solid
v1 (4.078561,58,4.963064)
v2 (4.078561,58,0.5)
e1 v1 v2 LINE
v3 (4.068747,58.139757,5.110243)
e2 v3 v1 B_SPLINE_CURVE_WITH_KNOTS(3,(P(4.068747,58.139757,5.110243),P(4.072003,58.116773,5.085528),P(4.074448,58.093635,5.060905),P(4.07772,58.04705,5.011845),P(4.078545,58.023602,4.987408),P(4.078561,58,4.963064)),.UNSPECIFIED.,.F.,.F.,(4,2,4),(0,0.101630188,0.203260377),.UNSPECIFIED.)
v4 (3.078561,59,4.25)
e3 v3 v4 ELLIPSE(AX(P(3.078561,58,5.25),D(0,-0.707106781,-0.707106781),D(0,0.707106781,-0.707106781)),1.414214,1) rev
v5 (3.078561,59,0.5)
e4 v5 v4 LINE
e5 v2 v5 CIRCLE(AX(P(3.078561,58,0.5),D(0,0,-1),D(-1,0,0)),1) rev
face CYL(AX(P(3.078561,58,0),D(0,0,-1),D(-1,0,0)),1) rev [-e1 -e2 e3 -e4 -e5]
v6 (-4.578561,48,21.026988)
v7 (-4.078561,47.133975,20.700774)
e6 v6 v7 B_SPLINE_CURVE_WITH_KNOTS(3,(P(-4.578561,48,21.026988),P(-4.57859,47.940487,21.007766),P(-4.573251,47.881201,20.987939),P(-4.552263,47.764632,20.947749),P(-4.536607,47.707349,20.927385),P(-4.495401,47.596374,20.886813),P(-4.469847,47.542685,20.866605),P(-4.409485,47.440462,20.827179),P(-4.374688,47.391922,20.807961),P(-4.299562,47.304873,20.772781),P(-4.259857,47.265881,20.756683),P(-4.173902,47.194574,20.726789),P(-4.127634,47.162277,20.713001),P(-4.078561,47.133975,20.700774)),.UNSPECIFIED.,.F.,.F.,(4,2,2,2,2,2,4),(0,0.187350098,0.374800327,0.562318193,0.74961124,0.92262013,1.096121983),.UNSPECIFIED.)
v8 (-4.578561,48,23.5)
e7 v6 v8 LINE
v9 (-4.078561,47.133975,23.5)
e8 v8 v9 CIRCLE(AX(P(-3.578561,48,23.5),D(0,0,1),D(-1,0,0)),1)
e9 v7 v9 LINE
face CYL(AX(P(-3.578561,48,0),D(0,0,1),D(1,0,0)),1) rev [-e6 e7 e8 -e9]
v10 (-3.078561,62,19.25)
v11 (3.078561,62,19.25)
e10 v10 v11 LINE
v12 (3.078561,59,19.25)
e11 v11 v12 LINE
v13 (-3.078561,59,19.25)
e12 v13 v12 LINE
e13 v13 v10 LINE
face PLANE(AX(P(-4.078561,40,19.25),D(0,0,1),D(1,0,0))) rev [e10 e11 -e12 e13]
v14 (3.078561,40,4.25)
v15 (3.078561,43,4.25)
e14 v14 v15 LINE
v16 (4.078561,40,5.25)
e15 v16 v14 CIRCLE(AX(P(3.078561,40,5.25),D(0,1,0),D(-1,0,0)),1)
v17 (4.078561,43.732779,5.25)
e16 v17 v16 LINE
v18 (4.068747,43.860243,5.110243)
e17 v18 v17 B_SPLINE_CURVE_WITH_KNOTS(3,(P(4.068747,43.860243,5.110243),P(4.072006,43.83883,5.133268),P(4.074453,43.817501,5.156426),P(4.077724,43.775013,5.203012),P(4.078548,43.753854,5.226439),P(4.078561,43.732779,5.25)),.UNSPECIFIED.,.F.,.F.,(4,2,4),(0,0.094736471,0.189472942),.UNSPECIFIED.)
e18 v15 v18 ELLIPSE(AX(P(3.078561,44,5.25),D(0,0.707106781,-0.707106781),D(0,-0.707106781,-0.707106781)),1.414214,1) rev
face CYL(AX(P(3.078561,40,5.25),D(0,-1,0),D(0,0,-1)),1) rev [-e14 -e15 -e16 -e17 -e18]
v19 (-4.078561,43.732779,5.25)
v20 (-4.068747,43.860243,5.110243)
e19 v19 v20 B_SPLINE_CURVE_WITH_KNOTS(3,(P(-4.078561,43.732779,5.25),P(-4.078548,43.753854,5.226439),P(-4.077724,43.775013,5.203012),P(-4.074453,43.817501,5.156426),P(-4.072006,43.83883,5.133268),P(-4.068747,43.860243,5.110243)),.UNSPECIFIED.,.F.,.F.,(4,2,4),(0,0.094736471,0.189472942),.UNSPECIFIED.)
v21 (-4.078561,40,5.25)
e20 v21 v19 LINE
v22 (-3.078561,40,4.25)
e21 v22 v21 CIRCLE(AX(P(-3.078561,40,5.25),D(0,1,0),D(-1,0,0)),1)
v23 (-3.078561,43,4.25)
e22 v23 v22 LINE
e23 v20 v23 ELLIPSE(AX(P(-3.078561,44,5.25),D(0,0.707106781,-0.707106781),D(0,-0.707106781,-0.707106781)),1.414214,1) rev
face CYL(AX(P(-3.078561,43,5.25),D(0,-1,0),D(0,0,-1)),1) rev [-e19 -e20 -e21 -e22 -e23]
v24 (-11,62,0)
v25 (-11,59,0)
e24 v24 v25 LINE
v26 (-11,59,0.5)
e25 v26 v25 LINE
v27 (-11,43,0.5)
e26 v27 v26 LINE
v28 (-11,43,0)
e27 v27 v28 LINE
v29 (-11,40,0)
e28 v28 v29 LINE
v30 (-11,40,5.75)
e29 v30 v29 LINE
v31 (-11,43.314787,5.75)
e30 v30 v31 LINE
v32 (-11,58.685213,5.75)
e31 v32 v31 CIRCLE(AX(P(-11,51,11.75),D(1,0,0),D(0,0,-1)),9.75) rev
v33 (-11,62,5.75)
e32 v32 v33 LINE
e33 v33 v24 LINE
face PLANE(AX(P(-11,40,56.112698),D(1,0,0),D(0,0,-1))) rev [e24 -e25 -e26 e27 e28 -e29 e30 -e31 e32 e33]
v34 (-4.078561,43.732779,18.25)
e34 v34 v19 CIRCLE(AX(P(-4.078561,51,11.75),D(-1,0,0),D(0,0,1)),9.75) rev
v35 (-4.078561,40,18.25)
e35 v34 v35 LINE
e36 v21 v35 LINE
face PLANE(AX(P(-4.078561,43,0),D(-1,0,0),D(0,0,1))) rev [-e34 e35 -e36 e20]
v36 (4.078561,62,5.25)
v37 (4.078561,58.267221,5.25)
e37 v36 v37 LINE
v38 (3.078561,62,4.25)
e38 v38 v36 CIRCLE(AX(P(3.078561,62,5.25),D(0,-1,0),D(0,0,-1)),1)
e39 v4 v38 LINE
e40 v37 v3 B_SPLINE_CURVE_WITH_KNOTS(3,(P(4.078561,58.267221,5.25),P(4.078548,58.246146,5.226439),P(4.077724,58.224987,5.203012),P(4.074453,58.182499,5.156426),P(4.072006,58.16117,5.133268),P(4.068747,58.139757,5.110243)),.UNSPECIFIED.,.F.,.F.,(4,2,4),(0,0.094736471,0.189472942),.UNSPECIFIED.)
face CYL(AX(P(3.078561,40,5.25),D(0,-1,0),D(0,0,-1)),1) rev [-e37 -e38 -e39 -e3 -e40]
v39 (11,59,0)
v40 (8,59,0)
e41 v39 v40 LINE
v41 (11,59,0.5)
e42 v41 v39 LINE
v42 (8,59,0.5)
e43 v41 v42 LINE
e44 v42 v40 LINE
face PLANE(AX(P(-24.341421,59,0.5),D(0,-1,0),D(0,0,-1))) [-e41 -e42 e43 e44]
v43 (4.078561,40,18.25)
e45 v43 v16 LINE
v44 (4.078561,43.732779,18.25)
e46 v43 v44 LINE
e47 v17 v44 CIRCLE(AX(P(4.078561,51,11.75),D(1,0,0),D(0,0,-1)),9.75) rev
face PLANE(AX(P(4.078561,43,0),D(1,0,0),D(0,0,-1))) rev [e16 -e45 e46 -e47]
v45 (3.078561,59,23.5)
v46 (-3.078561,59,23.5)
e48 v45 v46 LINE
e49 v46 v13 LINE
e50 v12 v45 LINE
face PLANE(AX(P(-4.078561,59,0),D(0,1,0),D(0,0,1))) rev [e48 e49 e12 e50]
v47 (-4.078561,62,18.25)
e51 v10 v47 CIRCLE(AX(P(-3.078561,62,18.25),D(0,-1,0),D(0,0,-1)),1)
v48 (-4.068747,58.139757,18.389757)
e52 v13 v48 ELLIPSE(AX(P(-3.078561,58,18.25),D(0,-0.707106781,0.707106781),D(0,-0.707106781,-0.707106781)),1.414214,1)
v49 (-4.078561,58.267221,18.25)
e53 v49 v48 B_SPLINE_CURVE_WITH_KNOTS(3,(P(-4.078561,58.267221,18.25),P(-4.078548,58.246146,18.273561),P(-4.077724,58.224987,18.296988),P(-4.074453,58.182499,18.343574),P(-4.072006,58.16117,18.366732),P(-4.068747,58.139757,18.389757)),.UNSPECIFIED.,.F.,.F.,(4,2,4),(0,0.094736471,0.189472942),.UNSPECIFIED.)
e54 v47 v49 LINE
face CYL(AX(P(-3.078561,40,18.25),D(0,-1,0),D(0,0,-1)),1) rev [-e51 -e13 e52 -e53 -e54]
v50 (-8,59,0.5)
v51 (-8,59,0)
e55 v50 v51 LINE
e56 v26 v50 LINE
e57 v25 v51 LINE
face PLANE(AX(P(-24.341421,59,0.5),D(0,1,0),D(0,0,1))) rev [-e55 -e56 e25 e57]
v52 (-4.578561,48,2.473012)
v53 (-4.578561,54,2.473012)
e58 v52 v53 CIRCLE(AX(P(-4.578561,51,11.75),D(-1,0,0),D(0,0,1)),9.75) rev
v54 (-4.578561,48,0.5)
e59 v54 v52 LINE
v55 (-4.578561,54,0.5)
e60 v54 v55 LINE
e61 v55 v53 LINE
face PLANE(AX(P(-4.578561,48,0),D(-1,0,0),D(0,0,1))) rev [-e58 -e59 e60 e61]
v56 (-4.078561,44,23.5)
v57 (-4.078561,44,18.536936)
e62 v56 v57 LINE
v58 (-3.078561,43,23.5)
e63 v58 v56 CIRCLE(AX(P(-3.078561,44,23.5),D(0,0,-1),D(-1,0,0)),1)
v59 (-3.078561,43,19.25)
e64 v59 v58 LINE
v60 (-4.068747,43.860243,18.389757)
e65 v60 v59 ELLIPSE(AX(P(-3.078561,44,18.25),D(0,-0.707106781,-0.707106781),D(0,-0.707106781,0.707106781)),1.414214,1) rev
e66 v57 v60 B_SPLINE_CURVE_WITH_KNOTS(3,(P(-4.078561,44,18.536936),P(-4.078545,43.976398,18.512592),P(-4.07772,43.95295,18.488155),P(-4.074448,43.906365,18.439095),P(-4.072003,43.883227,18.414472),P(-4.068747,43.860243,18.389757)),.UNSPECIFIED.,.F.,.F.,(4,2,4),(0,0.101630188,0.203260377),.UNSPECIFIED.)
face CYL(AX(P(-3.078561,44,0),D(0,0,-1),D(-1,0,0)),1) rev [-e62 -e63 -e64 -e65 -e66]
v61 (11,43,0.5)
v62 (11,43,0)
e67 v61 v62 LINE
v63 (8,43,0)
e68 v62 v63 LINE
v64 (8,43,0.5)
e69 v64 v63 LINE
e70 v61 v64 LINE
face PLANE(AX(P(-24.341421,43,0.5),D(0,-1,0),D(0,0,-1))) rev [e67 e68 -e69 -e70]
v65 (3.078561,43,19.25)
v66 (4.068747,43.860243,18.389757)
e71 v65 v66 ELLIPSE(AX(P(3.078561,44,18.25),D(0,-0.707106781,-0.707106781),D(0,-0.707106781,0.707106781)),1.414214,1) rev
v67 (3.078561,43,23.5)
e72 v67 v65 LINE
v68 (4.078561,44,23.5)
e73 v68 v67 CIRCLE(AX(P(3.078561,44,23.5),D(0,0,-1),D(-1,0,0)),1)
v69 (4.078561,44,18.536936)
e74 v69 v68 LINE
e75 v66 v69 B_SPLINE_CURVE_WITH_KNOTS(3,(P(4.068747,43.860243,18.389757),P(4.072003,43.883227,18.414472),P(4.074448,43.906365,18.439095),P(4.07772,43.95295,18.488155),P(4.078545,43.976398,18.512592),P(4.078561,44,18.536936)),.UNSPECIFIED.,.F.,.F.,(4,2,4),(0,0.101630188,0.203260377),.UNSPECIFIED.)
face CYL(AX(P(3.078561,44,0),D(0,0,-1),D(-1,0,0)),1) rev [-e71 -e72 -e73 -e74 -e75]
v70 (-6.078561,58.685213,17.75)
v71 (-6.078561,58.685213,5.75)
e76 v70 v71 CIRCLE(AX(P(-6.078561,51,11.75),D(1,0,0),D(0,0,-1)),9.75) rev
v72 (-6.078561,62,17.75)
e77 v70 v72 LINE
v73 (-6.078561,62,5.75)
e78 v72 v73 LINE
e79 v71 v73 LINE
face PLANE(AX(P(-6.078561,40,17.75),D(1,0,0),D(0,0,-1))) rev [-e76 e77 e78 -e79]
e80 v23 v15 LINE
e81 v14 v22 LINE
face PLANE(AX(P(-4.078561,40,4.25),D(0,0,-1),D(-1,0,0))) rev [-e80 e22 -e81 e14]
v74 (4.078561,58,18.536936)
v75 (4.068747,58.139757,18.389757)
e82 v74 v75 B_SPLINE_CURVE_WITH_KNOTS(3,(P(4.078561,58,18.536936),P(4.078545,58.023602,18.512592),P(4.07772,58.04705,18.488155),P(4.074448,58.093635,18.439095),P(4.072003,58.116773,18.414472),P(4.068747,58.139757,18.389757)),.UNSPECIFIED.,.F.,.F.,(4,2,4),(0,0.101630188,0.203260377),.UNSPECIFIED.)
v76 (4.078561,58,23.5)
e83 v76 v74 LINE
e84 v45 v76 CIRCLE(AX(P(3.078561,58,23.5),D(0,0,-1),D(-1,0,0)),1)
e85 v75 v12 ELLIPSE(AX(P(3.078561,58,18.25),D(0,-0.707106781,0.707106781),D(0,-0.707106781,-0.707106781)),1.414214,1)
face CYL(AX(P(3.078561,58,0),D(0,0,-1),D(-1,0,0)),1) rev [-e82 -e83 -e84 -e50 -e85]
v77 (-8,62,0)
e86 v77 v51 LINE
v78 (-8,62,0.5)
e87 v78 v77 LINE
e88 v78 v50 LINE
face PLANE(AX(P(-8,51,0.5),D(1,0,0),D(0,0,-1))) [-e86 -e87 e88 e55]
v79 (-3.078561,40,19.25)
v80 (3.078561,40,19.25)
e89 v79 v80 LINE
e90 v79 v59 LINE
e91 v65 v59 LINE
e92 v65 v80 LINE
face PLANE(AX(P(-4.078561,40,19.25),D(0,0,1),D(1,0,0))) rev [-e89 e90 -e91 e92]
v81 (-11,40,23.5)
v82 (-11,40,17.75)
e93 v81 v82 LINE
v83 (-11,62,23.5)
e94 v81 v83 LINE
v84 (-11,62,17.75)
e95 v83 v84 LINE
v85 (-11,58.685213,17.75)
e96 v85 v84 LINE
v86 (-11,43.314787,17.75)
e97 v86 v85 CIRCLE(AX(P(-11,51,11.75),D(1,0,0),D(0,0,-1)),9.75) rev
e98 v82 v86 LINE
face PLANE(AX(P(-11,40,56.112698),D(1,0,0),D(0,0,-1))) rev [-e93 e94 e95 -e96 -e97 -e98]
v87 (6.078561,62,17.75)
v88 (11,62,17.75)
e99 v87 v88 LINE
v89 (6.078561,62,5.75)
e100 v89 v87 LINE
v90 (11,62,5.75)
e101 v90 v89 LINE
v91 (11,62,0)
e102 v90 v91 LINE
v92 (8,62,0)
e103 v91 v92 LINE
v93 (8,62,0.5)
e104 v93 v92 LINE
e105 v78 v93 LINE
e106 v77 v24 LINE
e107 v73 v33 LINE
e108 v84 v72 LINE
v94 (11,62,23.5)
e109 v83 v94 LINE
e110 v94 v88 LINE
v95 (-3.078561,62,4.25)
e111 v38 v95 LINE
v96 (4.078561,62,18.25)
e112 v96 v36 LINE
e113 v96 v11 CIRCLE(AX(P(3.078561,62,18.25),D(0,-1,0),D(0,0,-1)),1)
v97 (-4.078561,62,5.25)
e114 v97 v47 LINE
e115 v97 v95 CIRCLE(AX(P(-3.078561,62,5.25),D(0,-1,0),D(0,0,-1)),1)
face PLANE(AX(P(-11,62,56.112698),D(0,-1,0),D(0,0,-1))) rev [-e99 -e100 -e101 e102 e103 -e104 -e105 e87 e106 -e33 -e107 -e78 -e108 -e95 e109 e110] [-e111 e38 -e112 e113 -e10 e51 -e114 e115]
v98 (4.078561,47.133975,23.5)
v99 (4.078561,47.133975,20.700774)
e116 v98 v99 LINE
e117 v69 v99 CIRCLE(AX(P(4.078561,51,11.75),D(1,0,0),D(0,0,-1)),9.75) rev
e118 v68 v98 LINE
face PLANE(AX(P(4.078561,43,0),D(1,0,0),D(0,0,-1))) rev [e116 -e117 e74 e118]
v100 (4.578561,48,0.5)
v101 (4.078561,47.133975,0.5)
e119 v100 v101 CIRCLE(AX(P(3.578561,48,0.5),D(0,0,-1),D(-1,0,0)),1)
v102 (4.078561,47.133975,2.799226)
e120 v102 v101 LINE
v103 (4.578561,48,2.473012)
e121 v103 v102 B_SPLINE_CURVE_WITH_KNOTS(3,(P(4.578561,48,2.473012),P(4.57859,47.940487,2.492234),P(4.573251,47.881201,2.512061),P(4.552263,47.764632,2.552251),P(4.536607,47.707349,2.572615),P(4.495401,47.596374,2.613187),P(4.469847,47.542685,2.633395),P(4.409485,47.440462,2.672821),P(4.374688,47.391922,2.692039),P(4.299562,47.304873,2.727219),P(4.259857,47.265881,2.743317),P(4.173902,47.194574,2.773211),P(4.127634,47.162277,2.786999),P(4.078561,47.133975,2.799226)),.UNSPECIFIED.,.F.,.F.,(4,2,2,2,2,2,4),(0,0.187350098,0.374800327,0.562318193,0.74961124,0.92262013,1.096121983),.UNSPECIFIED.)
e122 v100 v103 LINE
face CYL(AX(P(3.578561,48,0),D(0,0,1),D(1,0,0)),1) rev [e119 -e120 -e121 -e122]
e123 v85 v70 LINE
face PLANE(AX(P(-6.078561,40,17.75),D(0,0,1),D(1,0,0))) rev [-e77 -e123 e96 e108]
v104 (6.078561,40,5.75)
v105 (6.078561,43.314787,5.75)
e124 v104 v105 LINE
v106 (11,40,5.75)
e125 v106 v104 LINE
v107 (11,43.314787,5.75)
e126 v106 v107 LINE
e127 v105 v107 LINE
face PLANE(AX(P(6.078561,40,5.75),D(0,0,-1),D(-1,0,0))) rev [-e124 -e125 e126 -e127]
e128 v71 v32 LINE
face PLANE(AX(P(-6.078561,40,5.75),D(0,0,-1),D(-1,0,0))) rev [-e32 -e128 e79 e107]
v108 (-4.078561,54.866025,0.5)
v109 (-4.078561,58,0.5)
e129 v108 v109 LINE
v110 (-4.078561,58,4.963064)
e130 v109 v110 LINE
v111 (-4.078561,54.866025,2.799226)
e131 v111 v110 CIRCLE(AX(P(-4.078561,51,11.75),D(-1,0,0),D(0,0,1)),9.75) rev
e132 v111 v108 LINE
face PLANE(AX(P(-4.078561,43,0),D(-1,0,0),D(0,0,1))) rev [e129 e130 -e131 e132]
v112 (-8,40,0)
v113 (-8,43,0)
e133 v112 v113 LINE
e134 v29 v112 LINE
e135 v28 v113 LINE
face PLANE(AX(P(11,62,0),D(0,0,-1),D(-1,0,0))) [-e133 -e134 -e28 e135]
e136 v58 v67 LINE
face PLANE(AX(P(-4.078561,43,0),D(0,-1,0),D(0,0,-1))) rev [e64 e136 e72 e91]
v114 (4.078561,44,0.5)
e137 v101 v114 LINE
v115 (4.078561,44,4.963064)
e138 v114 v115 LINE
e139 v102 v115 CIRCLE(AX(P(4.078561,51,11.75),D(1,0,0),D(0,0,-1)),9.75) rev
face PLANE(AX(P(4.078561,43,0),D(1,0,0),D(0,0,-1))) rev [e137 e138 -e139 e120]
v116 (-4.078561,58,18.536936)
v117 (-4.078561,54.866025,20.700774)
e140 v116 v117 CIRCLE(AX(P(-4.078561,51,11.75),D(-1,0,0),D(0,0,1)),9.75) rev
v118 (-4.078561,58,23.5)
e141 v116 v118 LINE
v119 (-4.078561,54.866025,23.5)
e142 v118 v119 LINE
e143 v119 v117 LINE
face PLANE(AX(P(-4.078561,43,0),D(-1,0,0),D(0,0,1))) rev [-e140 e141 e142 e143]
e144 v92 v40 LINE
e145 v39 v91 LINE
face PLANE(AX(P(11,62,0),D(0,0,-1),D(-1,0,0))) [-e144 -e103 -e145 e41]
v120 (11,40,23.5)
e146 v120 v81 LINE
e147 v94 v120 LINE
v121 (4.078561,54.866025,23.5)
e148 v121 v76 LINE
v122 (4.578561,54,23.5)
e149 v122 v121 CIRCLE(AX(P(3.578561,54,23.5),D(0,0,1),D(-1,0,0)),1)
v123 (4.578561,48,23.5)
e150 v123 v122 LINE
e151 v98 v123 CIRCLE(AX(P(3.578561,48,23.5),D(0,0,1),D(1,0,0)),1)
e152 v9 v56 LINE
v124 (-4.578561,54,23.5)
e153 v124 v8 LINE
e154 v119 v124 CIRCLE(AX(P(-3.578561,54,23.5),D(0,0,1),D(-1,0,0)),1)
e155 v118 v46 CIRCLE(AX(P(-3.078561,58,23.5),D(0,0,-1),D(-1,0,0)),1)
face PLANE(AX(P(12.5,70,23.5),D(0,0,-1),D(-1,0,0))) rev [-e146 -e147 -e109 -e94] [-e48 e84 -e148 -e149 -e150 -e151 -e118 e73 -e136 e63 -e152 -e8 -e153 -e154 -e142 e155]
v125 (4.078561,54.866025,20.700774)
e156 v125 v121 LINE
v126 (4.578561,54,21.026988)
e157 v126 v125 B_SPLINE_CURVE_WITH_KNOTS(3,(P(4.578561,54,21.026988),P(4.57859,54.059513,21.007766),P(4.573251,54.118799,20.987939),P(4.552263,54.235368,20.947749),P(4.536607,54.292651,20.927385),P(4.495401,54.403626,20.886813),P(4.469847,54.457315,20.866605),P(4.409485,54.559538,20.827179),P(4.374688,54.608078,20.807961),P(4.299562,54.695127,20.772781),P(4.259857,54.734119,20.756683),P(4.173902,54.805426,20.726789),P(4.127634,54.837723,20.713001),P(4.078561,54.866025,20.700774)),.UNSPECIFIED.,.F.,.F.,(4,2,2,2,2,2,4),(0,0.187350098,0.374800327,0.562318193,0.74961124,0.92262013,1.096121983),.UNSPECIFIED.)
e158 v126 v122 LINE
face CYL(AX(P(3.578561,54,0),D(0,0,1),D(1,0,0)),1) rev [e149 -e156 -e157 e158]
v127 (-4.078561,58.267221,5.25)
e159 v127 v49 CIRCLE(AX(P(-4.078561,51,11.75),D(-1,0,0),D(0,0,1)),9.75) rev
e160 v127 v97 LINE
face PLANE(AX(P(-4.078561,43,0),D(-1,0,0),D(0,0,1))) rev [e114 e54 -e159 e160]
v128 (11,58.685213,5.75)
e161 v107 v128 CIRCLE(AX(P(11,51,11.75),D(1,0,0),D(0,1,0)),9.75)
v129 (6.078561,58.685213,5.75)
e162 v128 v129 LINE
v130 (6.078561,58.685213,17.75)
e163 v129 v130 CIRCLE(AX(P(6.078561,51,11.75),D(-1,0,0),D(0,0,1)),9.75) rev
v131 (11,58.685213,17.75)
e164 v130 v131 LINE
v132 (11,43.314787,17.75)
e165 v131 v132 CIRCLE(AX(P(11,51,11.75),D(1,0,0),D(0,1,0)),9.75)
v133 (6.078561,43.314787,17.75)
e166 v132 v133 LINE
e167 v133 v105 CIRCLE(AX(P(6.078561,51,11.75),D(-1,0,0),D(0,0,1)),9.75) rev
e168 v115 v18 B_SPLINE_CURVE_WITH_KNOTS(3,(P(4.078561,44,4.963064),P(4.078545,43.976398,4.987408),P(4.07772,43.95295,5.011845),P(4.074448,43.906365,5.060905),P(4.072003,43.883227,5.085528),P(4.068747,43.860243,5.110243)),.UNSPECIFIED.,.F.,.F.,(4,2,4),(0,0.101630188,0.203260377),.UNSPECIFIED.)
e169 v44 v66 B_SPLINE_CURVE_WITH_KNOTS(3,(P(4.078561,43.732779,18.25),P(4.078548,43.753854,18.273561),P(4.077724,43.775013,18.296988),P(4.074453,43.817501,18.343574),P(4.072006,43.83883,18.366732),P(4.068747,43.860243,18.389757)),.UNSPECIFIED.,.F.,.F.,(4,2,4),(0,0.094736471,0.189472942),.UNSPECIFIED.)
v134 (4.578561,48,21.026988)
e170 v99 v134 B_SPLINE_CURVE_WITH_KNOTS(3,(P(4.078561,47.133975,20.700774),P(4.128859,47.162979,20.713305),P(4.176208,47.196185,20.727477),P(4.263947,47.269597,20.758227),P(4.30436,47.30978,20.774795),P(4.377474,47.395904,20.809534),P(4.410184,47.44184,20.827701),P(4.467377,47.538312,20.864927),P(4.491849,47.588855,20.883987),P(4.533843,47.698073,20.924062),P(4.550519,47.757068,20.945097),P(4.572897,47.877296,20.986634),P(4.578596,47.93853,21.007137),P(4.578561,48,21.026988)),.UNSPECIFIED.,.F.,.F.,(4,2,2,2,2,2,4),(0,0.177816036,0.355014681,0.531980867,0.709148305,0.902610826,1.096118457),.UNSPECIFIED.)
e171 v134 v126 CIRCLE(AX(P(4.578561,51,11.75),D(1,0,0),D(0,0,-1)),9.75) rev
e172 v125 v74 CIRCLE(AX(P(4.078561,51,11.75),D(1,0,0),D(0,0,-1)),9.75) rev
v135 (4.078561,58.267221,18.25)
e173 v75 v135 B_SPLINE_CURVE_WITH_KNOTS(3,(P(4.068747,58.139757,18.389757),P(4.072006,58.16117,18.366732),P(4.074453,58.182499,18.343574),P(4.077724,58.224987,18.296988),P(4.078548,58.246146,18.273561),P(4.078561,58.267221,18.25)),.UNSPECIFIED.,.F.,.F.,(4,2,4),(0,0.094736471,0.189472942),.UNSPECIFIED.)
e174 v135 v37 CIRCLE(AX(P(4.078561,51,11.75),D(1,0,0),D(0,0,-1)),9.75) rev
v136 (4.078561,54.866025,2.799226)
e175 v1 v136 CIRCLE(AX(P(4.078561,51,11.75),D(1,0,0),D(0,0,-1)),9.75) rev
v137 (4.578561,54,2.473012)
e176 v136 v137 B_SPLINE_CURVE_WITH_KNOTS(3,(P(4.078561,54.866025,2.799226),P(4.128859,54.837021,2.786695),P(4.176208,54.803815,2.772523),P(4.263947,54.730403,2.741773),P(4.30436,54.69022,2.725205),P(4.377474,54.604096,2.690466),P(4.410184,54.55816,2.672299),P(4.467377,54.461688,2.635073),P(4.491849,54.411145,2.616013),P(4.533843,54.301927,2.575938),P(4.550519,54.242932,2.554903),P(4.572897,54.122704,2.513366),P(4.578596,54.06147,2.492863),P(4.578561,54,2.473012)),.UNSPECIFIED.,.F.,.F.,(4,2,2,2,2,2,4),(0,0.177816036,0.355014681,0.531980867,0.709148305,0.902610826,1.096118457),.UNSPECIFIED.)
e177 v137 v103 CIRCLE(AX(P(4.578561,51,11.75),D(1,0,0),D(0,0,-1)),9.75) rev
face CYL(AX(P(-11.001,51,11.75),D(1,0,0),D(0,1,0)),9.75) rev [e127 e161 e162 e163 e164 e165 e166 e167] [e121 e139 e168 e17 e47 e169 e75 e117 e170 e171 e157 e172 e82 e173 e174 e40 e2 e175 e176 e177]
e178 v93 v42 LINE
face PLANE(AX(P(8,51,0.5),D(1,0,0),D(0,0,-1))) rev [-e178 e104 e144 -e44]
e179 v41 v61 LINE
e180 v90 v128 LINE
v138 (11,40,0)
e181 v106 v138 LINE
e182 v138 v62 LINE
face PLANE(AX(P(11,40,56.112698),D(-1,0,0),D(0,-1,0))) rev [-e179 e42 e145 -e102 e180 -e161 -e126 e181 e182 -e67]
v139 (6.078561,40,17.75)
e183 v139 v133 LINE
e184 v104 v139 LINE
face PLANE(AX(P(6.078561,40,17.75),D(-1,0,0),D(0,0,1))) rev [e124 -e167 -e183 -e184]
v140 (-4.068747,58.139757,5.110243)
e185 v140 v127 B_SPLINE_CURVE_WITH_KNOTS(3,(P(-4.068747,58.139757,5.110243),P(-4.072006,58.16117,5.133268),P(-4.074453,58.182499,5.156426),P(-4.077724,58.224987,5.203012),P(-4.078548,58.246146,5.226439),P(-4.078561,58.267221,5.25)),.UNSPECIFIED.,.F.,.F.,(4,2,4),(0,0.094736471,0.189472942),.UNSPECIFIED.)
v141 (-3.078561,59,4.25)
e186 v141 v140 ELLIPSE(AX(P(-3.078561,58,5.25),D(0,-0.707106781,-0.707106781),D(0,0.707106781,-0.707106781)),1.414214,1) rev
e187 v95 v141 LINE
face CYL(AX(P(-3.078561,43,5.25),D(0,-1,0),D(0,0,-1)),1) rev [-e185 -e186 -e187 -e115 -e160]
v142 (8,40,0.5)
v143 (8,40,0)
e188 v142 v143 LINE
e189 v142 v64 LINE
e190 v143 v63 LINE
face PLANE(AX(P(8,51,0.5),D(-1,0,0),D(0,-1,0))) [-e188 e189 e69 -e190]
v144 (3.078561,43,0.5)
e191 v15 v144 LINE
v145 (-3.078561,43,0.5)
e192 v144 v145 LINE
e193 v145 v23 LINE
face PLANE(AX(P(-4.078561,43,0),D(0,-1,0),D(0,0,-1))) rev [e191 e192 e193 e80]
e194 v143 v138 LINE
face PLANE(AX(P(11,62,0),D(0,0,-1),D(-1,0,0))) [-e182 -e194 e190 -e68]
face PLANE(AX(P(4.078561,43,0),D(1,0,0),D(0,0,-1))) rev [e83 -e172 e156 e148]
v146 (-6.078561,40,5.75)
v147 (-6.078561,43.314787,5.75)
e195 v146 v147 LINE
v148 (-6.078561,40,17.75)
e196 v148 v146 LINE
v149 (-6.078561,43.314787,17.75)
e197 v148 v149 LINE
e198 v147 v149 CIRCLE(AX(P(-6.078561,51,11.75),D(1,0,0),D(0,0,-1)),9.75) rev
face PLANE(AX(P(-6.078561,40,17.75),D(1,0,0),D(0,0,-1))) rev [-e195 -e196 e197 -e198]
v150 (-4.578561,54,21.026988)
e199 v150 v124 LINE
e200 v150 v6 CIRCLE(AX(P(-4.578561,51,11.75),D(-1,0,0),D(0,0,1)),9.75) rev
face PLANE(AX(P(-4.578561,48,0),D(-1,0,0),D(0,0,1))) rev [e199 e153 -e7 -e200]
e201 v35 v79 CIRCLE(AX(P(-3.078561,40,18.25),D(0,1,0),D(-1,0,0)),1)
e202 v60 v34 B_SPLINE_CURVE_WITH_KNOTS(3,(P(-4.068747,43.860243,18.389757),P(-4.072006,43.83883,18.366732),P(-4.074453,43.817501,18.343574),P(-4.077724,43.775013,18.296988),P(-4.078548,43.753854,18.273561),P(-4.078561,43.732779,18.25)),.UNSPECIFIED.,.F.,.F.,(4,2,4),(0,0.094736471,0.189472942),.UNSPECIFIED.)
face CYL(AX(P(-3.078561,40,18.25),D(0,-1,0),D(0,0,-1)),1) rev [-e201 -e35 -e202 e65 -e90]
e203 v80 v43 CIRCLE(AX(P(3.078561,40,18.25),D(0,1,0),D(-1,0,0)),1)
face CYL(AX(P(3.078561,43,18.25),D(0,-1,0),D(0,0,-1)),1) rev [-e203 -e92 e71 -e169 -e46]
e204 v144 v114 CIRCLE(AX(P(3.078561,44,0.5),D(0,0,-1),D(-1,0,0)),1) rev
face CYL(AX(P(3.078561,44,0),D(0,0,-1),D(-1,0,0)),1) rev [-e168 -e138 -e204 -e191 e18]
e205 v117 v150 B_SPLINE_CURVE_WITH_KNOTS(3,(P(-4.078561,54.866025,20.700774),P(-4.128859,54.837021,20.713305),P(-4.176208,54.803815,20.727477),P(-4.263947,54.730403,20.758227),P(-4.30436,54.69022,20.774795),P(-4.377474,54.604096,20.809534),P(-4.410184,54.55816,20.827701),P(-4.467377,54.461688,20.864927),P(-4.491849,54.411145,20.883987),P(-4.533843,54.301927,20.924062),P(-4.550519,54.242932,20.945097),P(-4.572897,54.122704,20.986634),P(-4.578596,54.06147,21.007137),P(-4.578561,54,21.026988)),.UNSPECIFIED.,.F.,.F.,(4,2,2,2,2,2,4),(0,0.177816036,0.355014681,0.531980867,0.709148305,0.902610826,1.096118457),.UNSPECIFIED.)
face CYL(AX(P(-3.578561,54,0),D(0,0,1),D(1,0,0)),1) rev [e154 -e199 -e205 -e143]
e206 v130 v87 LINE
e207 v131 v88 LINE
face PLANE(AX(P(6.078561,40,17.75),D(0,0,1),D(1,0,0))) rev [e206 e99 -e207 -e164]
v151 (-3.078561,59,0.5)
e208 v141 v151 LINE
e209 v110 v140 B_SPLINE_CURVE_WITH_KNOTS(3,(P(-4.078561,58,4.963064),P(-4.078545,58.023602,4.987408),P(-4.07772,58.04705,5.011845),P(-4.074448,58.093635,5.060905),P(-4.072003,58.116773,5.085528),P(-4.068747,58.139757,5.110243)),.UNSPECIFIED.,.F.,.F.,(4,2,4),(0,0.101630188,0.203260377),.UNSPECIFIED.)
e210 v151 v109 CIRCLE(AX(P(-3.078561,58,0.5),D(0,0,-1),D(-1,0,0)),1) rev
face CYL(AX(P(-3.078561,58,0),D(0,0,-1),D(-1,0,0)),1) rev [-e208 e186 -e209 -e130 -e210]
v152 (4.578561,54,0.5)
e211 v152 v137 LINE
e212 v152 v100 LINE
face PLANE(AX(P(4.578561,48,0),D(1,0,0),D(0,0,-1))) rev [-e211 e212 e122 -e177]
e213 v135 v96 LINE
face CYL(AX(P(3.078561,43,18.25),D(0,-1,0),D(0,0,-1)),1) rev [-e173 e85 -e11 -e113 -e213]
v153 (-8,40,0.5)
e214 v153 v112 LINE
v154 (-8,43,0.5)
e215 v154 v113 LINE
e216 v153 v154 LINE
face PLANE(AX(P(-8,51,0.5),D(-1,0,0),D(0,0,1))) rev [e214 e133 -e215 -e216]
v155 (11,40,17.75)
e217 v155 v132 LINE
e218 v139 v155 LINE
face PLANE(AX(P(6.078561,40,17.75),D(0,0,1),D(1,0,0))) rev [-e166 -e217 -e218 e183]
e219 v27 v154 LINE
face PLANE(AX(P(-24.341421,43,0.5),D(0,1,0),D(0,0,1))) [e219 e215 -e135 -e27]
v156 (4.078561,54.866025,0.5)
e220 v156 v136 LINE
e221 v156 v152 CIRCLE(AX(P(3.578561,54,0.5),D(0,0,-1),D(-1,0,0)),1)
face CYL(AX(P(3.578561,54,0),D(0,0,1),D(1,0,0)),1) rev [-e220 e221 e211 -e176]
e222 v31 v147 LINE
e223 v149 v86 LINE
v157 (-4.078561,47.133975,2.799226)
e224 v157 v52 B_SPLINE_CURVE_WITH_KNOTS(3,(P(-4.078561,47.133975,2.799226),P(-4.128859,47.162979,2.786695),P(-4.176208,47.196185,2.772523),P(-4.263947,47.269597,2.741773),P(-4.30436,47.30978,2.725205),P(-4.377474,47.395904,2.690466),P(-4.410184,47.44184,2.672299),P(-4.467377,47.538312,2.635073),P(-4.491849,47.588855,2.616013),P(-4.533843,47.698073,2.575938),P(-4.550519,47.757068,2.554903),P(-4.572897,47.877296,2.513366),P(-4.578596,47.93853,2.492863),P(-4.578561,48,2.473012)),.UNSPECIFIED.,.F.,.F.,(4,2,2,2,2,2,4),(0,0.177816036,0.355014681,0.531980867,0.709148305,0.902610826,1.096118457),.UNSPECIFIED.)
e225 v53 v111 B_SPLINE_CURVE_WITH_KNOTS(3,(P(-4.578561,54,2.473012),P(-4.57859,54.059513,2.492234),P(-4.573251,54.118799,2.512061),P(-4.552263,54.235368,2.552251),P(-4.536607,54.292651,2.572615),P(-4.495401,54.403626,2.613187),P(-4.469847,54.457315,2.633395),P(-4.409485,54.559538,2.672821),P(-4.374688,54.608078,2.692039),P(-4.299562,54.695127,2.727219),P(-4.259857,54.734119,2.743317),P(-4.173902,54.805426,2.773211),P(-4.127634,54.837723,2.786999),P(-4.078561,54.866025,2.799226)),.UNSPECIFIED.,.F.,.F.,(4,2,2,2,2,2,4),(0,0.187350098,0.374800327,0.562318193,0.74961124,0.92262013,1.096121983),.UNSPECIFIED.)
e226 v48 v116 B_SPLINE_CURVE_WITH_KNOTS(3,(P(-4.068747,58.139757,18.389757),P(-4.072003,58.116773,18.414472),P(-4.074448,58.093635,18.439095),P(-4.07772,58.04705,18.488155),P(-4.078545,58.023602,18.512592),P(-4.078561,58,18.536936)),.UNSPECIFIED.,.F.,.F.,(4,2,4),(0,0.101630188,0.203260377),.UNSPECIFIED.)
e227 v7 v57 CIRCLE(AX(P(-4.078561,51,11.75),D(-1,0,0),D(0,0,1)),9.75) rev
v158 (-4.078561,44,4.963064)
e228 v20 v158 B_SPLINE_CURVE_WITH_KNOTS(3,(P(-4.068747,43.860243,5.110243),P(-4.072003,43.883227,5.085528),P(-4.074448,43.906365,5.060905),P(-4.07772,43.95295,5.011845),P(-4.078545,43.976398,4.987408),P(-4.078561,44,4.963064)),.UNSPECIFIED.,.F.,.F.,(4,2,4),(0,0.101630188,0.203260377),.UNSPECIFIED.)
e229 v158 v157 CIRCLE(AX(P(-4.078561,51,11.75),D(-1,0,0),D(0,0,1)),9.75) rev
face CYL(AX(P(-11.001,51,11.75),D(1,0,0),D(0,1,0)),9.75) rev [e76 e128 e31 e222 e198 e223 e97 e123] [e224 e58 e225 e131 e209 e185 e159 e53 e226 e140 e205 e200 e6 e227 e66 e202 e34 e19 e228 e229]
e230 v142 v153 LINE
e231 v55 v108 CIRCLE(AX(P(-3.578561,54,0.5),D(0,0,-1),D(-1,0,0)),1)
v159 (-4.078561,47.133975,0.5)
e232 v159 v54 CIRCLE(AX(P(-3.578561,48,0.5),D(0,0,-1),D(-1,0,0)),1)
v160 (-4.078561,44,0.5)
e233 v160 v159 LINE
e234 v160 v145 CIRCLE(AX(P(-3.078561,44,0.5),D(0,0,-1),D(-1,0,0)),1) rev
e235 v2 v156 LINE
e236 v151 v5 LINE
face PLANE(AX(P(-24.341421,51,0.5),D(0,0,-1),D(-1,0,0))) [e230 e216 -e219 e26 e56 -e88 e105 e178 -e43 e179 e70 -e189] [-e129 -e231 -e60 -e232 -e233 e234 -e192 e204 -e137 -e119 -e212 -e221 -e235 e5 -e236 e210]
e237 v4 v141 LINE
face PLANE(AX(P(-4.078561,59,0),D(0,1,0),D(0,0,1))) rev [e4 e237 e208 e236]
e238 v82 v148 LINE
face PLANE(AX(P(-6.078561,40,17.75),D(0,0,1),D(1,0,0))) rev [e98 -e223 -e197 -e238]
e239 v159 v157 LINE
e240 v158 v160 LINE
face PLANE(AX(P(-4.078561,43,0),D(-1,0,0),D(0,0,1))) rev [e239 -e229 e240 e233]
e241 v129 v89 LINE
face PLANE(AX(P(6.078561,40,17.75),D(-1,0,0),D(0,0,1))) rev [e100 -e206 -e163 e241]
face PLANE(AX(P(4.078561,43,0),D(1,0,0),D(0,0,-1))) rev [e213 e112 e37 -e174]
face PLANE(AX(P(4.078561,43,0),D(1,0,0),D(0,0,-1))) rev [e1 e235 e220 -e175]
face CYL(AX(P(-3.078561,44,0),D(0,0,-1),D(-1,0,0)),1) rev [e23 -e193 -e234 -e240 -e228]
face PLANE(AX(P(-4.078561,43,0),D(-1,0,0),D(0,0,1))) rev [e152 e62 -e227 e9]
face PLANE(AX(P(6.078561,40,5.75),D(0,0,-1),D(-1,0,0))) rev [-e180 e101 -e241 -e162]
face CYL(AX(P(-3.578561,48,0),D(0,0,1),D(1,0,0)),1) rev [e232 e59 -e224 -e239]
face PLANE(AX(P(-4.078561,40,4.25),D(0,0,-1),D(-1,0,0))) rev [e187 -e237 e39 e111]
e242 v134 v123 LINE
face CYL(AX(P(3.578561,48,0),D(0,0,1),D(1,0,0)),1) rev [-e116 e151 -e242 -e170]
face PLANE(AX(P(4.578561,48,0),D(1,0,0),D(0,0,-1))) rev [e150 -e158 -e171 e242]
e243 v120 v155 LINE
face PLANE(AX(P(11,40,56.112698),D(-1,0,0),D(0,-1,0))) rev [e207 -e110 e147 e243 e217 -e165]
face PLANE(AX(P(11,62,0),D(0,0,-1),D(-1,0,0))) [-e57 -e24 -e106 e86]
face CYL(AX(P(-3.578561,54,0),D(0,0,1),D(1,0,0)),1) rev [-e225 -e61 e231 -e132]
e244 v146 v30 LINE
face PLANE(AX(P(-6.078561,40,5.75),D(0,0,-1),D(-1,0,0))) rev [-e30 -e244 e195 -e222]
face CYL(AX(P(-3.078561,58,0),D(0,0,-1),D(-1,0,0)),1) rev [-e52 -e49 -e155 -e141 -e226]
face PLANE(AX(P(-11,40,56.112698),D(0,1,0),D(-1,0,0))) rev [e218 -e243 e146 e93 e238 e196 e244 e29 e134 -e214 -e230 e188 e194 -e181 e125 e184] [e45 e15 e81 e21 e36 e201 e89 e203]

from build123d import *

# Parameters (mm, degrees)
SKETCH1_W           = 22
SKETCH1_H           = 22
BOSS_EXTRUDE1_DEPTH = 23.5
CUT_EXTRUDE1_REACH  = 71.859
SKETCH2_R           = 9.75
CUT_EXTRUDE2_DEPTH  = 0.5
SKETCH5_W           = 8.157122282
SKETCH5_H           = 16
CUT_EXTRUDE3_DEPTH  = 68.210490253
SKETCH6_W           = 8.157122282
SKETCH6_H           = 15
CUT_EXTRUDE4_DEPTH  = 35.018377386
SKETCH7_W           = 4.921438859
SKETCH7_H           = 12
CUT_EXTRUDE5_DEPTH  = 35.018377386
CUT_EXTRUDE6_DEPTH  = 68.210490253
FILLET1_R           = 1


with BuildPart() as part:
    # Sketch1 → Boss-Extrude1 (new body)
    with BuildSketch(Plane.XY):
        with Locations((0, 51)):
            Rectangle(SKETCH1_W, SKETCH1_H)
    extrude(amount=BOSS_EXTRUDE1_DEPTH)

    # Sketch2 → Cut-Extrude1 (cut, up to next)
    with BuildSketch(Plane(origin=(11, 0, 0), x_dir=(0, 0, -1), z_dir=(1, 0, 0)), mode=Mode.PRIVATE) as cut_extrude1_sk1:
        with Locations(Location((-11.75, 51, 0), (0, 0, 90))):
            Circle(SKETCH2_R)
    cut_extrude1_tool1 = extrude(cut_extrude1_sk1.sketch, amount=-CUT_EXTRUDE1_REACH, mode=Mode.PRIVATE) & part.part
    add(cut_extrude1_tool1.solids().sort_by_distance((11, 51, 11.75))[0], mode=Mode.SUBTRACT)

    # Sketch3 → Cut-Extrude2 (cut)
    with BuildSketch(Plane(origin=(0, 0, 0), x_dir=(-1, 0, 0), z_dir=(0, 0, -1))):
        Polygon((11, 43), (11, 59), (8, 59), (8, 62), (-8, 62), (-8, 59), (-11, 59), (-11, 43), (-8, 43), (-8, 40), (8, 40), (8, 43), align=None)
    extrude(amount=-CUT_EXTRUDE2_DEPTH, mode=Mode.SUBTRACT)

    # Sketch5 → Cut-Extrude3 (cut, through all)
    with BuildSketch(Plane.XY.offset(23.5)):
        with Locations((0, 51)):
            Rectangle(SKETCH5_W, SKETCH5_H)
    extrude(amount=-CUT_EXTRUDE3_DEPTH, mode=Mode.SUBTRACT)

    # Sketch6 → Cut-Extrude4 (cut, through all)
    with BuildSketch(Plane(origin=(0, 62, 0), x_dir=(1, 0, 0), z_dir=(0, 1, 0))):
        with Locations((0, -11.75)):
            Rectangle(SKETCH6_W, SKETCH6_H)
    extrude(amount=-CUT_EXTRUDE4_DEPTH, mode=Mode.SUBTRACT)

    # Sketch7 → Cut-Extrude5 (cut, through all)
    with BuildSketch(Plane(origin=(0, 62, 0), x_dir=(1, 0, 0), z_dir=(0, 1, 0))):
        with Locations((8.539280571, -11.75)):
            Rectangle(SKETCH7_W, SKETCH7_H)
        with Locations((-8.539280571, -11.75)):
            Rectangle(SKETCH7_W, SKETCH7_H)
    extrude(amount=-CUT_EXTRUDE5_DEPTH, mode=Mode.SUBTRACT)

    # Sketch8 → Cut-Extrude6 (cut, through all)
    with BuildSketch(Plane.XY.offset(23.5)):
        with BuildLine():
            Line((-3.578561141, 47), (3.578561141, 47))
            ThreePointArc((3.578561141, 47), (4.285667922, 47.292893219), (4.578561141, 48))
            Line((4.578561141, 48), (4.578561141, 54))
            ThreePointArc((4.578561141, 54), (4.285667922, 54.707106781), (3.578561141, 55))
            Line((3.578561141, 55), (-3.578561141, 55))
            ThreePointArc((-3.578561141, 55), (-4.285667922, 54.707106781), (-4.578561141, 54))
            Line((-4.578561141, 54), (-4.578561141, 48))
            ThreePointArc((-4.578561141, 48), (-4.285667922, 47.292893219), (-3.578561141, 47))
        make_face()
    extrude(amount=-CUT_EXTRUDE6_DEPTH, mode=Mode.SUBTRACT)

    # Fillet1
    # the kernel refuses this fillet: 1 mm, written as the material it adds along each edge
    with BuildSketch(Plane(origin=(4.078561141, 59, 4.25), x_dir=(-1, 0, 0), z_dir=(0, 0, -1)), Plane(origin=(4.078561141, 43, 4.25), x_dir=(0, 1, 0), z_dir=(0, 0, -1)), Plane(origin=(-4.078561141, 59, 4.25), x_dir=(0, -1, 0), z_dir=(0, 0, -1))) as fillet1_piece_1:
        with BuildLine():
            CenterArc((FILLET1_R, -FILLET1_R), FILLET1_R, 90, 90)
            Line((0, -FILLET1_R), (0, 0))
            Line((0, 0), (FILLET1_R, 0))
        make_face()
    extrude(amount=3.75)
    with BuildSketch(Plane(origin=(-4.078561141, 43, 4.25), x_dir=(0, 1, 0), z_dir=(0, 0, -1))) as fillet1_piece_2:
        with BuildLine():
            CenterArc((FILLET1_R, FILLET1_R), FILLET1_R, 180, 90)
            Line((0, FILLET1_R), (0, 0))
            Line((0, 0), (FILLET1_R, 0))
        make_face()
    extrude(amount=3.75)
    with BuildSketch(Plane(origin=(4.078561141, 59, 23.5), x_dir=(0, -1, 0), z_dir=(0, 0, -1)), Plane(origin=(-4.078561141, 43, 23.5), x_dir=(0, 1, 0), z_dir=(0, 0, -1))) as fillet1_piece_3:
        with BuildLine():
            CenterArc((FILLET1_R, FILLET1_R), FILLET1_R, 180, 90)
            Line((0, FILLET1_R), (0, 0))
            Line((0, 0), (FILLET1_R, 0))
        make_face()
    extrude(amount=4.25)
    with BuildSketch(Plane(origin=(-4.078561141, 59, 23.5), x_dir=(0, -1, 0), z_dir=(0, 0, -1)), Plane(origin=(4.078561141, 43, 23.5), x_dir=(0, 1, 0), z_dir=(0, 0, -1))) as fillet1_piece_4:
        with BuildLine():
            CenterArc((FILLET1_R, -FILLET1_R), FILLET1_R, 90, 90)
            Line((0, -FILLET1_R), (0, 0))
            Line((0, 0), (FILLET1_R, 0))
        make_face()
    extrude(amount=4.25)
    with BuildSketch(Plane(origin=(-4.078561141, 62, 4.25), x_dir=(0, 0, 1), z_dir=(0, -1, 0)), Plane(origin=(-4.078561141, 43, 4.25), x_dir=(0, 0, 1), z_dir=(0, -1, 0)), Plane(origin=(4.078561141, 62, 19.25), x_dir=(0, 0, -1), z_dir=(0, -1, 0)), Plane(origin=(-4.078561141, 43, 19.25), x_dir=(1, 0, 0), z_dir=(0, -1, 0))) as fillet1_piece_5:
        with BuildLine():
            CenterArc((FILLET1_R, -FILLET1_R), FILLET1_R, 90, 90)
            Line((0, -FILLET1_R), (0, 0))
            Line((0, 0), (FILLET1_R, 0))
        make_face()
    extrude(amount=3)
    with BuildSketch(Plane(origin=(4.078561141, 43, 4.25), x_dir=(0, 0, 1), z_dir=(0, -1, 0)), Plane(origin=(4.078561141, 62, 4.25), x_dir=(0, 0, 1), z_dir=(0, -1, 0)), Plane(origin=(4.078561141, 43, 19.25), x_dir=(-1, 0, 0), z_dir=(0, -1, 0)), Plane(origin=(-4.078561141, 62, 19.25), x_dir=(0, 0, -1), z_dir=(0, -1, 0))) as fillet1_piece_6:
        with BuildLine():
            CenterArc((FILLET1_R, FILLET1_R), FILLET1_R, 180, 90)
            Line((0, FILLET1_R), (0, 0))
            Line((0, 0), (FILLET1_R, 0))
        make_face()
    extrude(amount=3)
    with BuildSketch(Plane(origin=(4.078561141, 59, 6.75), x_dir=(-1, 0, 0), z_dir=(0, 0, -1))) as fillet1_piece_7a_section:
        with BuildLine():
            CenterArc((FILLET1_R, -FILLET1_R), FILLET1_R, 90, 90)
            Line((0, -FILLET1_R), (0, 0))
            Line((0, 0), (FILLET1_R, 0))
        make_face()
    fillet1_piece_7a = extrude(amount=6.25, mode=Mode.PRIVATE)
    fillet1_piece_7a = split(fillet1_piece_7a, bisect_by=Plane(origin=(3.830285127, 58.809985628, 4.25), z_dir=(0, 0, 1)), keep=Keep.TOP, mode=Mode.PRIVATE)
    fillet1_piece_7a = fillet1_piece_7a - Plane(origin=(3.830285127, 51, 11.75), x_dir=(0, 1, 0), z_dir=(1, 0, 0)) * Cylinder(9.75, 17, mode=Mode.PRIVATE)
    with BuildSketch(Plane(origin=(4.078561141, 62, 4.25), x_dir=(0, 0, 1), z_dir=(0, -1, 0))) as fillet1_piece_7b_section:
        with BuildLine():
            CenterArc((FILLET1_R, FILLET1_R), FILLET1_R, 180, 90)
            Line((0, FILLET1_R), (0, 0))
            Line((0, 0), (FILLET1_R, 0))
        make_face()
    fillet1_piece_7b = extrude(amount=5.5, mode=Mode.PRIVATE)
    fillet1_piece_7b = split(fillet1_piece_7b, bisect_by=Plane(origin=(3.832225581, 59, 4.443177498), z_dir=(0, -1, 0)), keep=Keep.TOP, mode=Mode.PRIVATE)
    fillet1_piece_7b = fillet1_piece_7b - Plane(origin=(3.832225581, 51, 11.75), x_dir=(0, 1, 0), z_dir=(1, 0, 0)) * Cylinder(9.75, 15, mode=Mode.PRIVATE)
    fillet1_piece_7 = fillet1_piece_7a & fillet1_piece_7b
    add(fillet1_piece_7)
    with BuildSketch(Plane(origin=(4.078561141, 43, 6.75), x_dir=(0, 1, 0), z_dir=(0, 0, -1))) as fillet1_piece_8a_section:
        with BuildLine():
            CenterArc((FILLET1_R, -FILLET1_R), FILLET1_R, 90, 90)
            Line((0, -FILLET1_R), (0, 0))
            Line((0, 0), (FILLET1_R, 0))
        make_face()
    fillet1_piece_8a = extrude(amount=6.25, mode=Mode.PRIVATE)
    fillet1_piece_8a = fillet1_piece_8a - Plane(origin=(3.830283996, 51, 11.75), x_dir=(0, 1, 0), z_dir=(1, 0, 0)) * Cylinder(9.75, 17, mode=Mode.PRIVATE)
    fillet1_piece_8a = split(fillet1_piece_8a, bisect_by=Plane(origin=(3.830283996, 43.190015611, 4.25), z_dir=(0, 0, 1)), keep=Keep.TOP, mode=Mode.PRIVATE)
    with BuildSketch(Plane(origin=(4.078561141, 45.5, 4.25), x_dir=(0, 0, 1), z_dir=(0, -1, 0))) as fillet1_piece_8b_section:
        with BuildLine():
            CenterArc((FILLET1_R, FILLET1_R), FILLET1_R, 180, 90)
            Line((0, FILLET1_R), (0, 0))
            Line((0, 0), (FILLET1_R, 0))
        make_face()
    fillet1_piece_8b = extrude(amount=5.5, mode=Mode.PRIVATE)
    fillet1_piece_8b = fillet1_piece_8b - Plane(origin=(3.832225993, 51, 11.75), x_dir=(0, 1, 0), z_dir=(1, 0, 0)) * Cylinder(9.75, 15, mode=Mode.PRIVATE)
    fillet1_piece_8b = split(fillet1_piece_8b, bisect_by=Plane(origin=(3.832225993, 43, 4.443177034), z_dir=(0, 1, 0)), keep=Keep.TOP, mode=Mode.PRIVATE)
    fillet1_piece_8 = fillet1_piece_8a & fillet1_piece_8b
    add(fillet1_piece_8)
    with BuildSketch(Plane(origin=(-4.078561141, 45.5, 4.25), x_dir=(0, 0, 1), z_dir=(0, -1, 0))) as fillet1_piece_9a_section:
        with BuildLine():
            CenterArc((FILLET1_R, -FILLET1_R), FILLET1_R, 90, 90)
            Line((0, -FILLET1_R), (0, 0))
            Line((0, 0), (FILLET1_R, 0))
        make_face()
    fillet1_piece_9a = extrude(amount=5.5, mode=Mode.PRIVATE)
    fillet1_piece_9a = fillet1_piece_9a - Plane(origin=(-3.832225993, 51, 11.75), x_dir=(0, 1, 0), z_dir=(1, 0, 0)) * Cylinder(9.75, 15, mode=Mode.PRIVATE)
    fillet1_piece_9a = split(fillet1_piece_9a, bisect_by=Plane(origin=(-3.832225993, 43, 4.443177034), z_dir=(0, 1, 0)), keep=Keep.TOP, mode=Mode.PRIVATE)
    with BuildSketch(Plane(origin=(-4.078561141, 43, 6.75), x_dir=(0, 1, 0), z_dir=(0, 0, -1))) as fillet1_piece_9b_section:
        with BuildLine():
            CenterArc((FILLET1_R, FILLET1_R), FILLET1_R, 180, 90)
            Line((0, FILLET1_R), (0, 0))
            Line((0, 0), (FILLET1_R, 0))
        make_face()
    fillet1_piece_9b = extrude(amount=6.25, mode=Mode.PRIVATE)
    fillet1_piece_9b = fillet1_piece_9b - Plane(origin=(-3.830283996, 51, 11.75), x_dir=(0, 1, 0), z_dir=(1, 0, 0)) * Cylinder(9.75, 17, mode=Mode.PRIVATE)
    fillet1_piece_9b = split(fillet1_piece_9b, bisect_by=Plane(origin=(-3.830283996, 43.190015611, 4.25), z_dir=(0, 0, 1)), keep=Keep.TOP, mode=Mode.PRIVATE)
    fillet1_piece_9 = fillet1_piece_9a & fillet1_piece_9b
    add(fillet1_piece_9)
    with BuildSketch(Plane(origin=(-4.078561141, 59, 6.75), x_dir=(0, -1, 0), z_dir=(0, 0, -1))) as fillet1_piece_10a_section:
        with BuildLine():
            CenterArc((FILLET1_R, -FILLET1_R), FILLET1_R, 90, 90)
            Line((0, -FILLET1_R), (0, 0))
            Line((0, 0), (FILLET1_R, 0))
        make_face()
    fillet1_piece_10a = extrude(amount=6.25, mode=Mode.PRIVATE)
    fillet1_piece_10a = fillet1_piece_10a - Plane(origin=(-3.830284938, 51, 11.75), x_dir=(0, 1, 0), z_dir=(1, 0, 0)) * Cylinder(9.75, 17, mode=Mode.PRIVATE)
    fillet1_piece_10a = split(fillet1_piece_10a, bisect_by=Plane(origin=(-3.830284938, 58.80998536, 4.25), z_dir=(0, 0, 1)), keep=Keep.TOP, mode=Mode.PRIVATE)
    with BuildSketch(Plane(origin=(-4.078561141, 62, 4.25), x_dir=(0, 0, 1), z_dir=(0, -1, 0))) as fillet1_piece_10b_section:
        with BuildLine():
            CenterArc((FILLET1_R, -FILLET1_R), FILLET1_R, 90, 90)
            Line((0, -FILLET1_R), (0, 0))
            Line((0, 0), (FILLET1_R, 0))
        make_face()
    fillet1_piece_10b = extrude(amount=5.5, mode=Mode.PRIVATE)
    fillet1_piece_10b = fillet1_piece_10b - Plane(origin=(-3.832225581, 51, 11.75), x_dir=(0, 1, 0), z_dir=(1, 0, 0)) * Cylinder(9.75, 15, mode=Mode.PRIVATE)
    fillet1_piece_10b = split(fillet1_piece_10b, bisect_by=Plane(origin=(-3.832225581, 59, 4.443177498), z_dir=(0, -1, 0)), keep=Keep.TOP, mode=Mode.PRIVATE)
    fillet1_piece_10 = fillet1_piece_10a & fillet1_piece_10b
    add(fillet1_piece_10)
    with BuildSketch(Plane(origin=(4.078561141, 59, 23.5), x_dir=(0, -1, 0), z_dir=(0, 0, -1))) as fillet1_piece_11a_section:
        with BuildLine():
            CenterArc((FILLET1_R, FILLET1_R), FILLET1_R, 180, 90)
            Line((0, FILLET1_R), (0, 0))
            Line((0, 0), (FILLET1_R, 0))
        make_face()
    fillet1_piece_11a = extrude(amount=6.75, mode=Mode.PRIVATE)
    fillet1_piece_11a = fillet1_piece_11a - Plane(origin=(3.830283996, 51, 11.75), x_dir=(0, 1, 0), z_dir=(1, 0, 0)) * Cylinder(9.75, 18, mode=Mode.PRIVATE)
    fillet1_piece_11a = split(fillet1_piece_11a, bisect_by=Plane(origin=(3.830283996, 58.80998439, 19.25), z_dir=(0, 0, -1)), keep=Keep.TOP, mode=Mode.PRIVATE)
    with BuildSketch(Plane(origin=(4.078561141, 62, 19.25), x_dir=(0, 0, -1), z_dir=(0, -1, 0))) as fillet1_piece_11b_section:
        with BuildLine():
            CenterArc((FILLET1_R, -FILLET1_R), FILLET1_R, 90, 90)
            Line((0, -FILLET1_R), (0, 0))
            Line((0, 0), (FILLET1_R, 0))
        make_face()
    fillet1_piece_11b = extrude(amount=5.5, mode=Mode.PRIVATE)
    fillet1_piece_11b = fillet1_piece_11b - Plane(origin=(3.832225993, 51, 11.75), x_dir=(0, 1, 0), z_dir=(1, 0, 0)) * Cylinder(9.75, 15, mode=Mode.PRIVATE)
    fillet1_piece_11b = split(fillet1_piece_11b, bisect_by=Plane(origin=(3.832225993, 59, 19.056822966), z_dir=(0, -1, 0)), keep=Keep.TOP, mode=Mode.PRIVATE)
    fillet1_piece_11 = fillet1_piece_11a & fillet1_piece_11b
    add(fillet1_piece_11)
    with BuildSketch(Plane(origin=(-4.078561141, 62, 19.25), x_dir=(0, 0, -1), z_dir=(0, -1, 0))) as fillet1_piece_12a_section:
        with BuildLine():
            CenterArc((FILLET1_R, FILLET1_R), FILLET1_R, 180, 90)
            Line((0, FILLET1_R), (0, 0))
            Line((0, 0), (FILLET1_R, 0))
        make_face()
    fillet1_piece_12a = extrude(amount=5.5, mode=Mode.PRIVATE)
    fillet1_piece_12a = fillet1_piece_12a - Plane(origin=(-3.832225993, 51, 11.75), x_dir=(0, 1, 0), z_dir=(1, 0, 0)) * Cylinder(9.75, 15, mode=Mode.PRIVATE)
    fillet1_piece_12a = split(fillet1_piece_12a, bisect_by=Plane(origin=(-3.832225993, 59, 19.056822966), z_dir=(0, -1, 0)), keep=Keep.TOP, mode=Mode.PRIVATE)
    with BuildSketch(Plane(origin=(-4.078561141, 59, 23.5), x_dir=(0, -1, 0), z_dir=(0, 0, -1))) as fillet1_piece_12b_section:
        with BuildLine():
            CenterArc((FILLET1_R, -FILLET1_R), FILLET1_R, 90, 90)
            Line((0, -FILLET1_R), (0, 0))
            Line((0, 0), (FILLET1_R, 0))
        make_face()
    fillet1_piece_12b = extrude(amount=6.75, mode=Mode.PRIVATE)
    fillet1_piece_12b = fillet1_piece_12b - Plane(origin=(-3.830283996, 51, 11.75), x_dir=(0, 1, 0), z_dir=(1, 0, 0)) * Cylinder(9.75, 18, mode=Mode.PRIVATE)
    fillet1_piece_12b = split(fillet1_piece_12b, bisect_by=Plane(origin=(-3.830283996, 58.809984389, 19.25), z_dir=(0, 0, -1)), keep=Keep.TOP, mode=Mode.PRIVATE)
    fillet1_piece_12 = fillet1_piece_12a & fillet1_piece_12b
    add(fillet1_piece_12)
    with BuildSketch(Plane(origin=(-4.078561141, 45.5, 19.25), x_dir=(1, 0, 0), z_dir=(0, -1, 0))) as fillet1_piece_13a_section:
        with BuildLine():
            CenterArc((FILLET1_R, -FILLET1_R), FILLET1_R, 90, 90)
            Line((0, -FILLET1_R), (0, 0))
            Line((0, 0), (FILLET1_R, 0))
        make_face()
    fillet1_piece_13a = extrude(amount=5.5, mode=Mode.PRIVATE)
    fillet1_piece_13a = split(fillet1_piece_13a, bisect_by=Plane(origin=(-3.832225691, 43, 19.056822612), z_dir=(0, 1, 0)), keep=Keep.TOP, mode=Mode.PRIVATE)
    fillet1_piece_13a = fillet1_piece_13a - Plane(origin=(-3.832225691, 51, 11.75), x_dir=(0, 1, 0), z_dir=(1, 0, 0)) * Cylinder(9.75, 15, mode=Mode.PRIVATE)
    with BuildSketch(Plane(origin=(-4.078561141, 43, 23.5), x_dir=(0, 1, 0), z_dir=(0, 0, -1))) as fillet1_piece_13b_section:
        with BuildLine():
            CenterArc((FILLET1_R, FILLET1_R), FILLET1_R, 180, 90)
            Line((0, FILLET1_R), (0, 0))
            Line((0, 0), (FILLET1_R, 0))
        make_face()
    fillet1_piece_13b = extrude(amount=6.75, mode=Mode.PRIVATE)
    fillet1_piece_13b = split(fillet1_piece_13b, bisect_by=Plane(origin=(-3.830284938, 43.190014641, 19.25), z_dir=(0, 0, -1)), keep=Keep.TOP, mode=Mode.PRIVATE)
    fillet1_piece_13b = fillet1_piece_13b - Plane(origin=(-3.830284938, 51, 11.75), x_dir=(0, 1, 0), z_dir=(1, 0, 0)) * Cylinder(9.75, 18, mode=Mode.PRIVATE)
    fillet1_piece_13 = fillet1_piece_13a & fillet1_piece_13b
    add(fillet1_piece_13)
    with BuildSketch(Plane(origin=(4.078561141, 45.5, 19.25), x_dir=(-1, 0, 0), z_dir=(0, -1, 0))) as fillet1_piece_14a_section:
        with BuildLine():
            CenterArc((FILLET1_R, FILLET1_R), FILLET1_R, 180, 90)
            Line((0, FILLET1_R), (0, 0))
            Line((0, 0), (FILLET1_R, 0))
        make_face()
    fillet1_piece_14a = extrude(amount=5.5, mode=Mode.PRIVATE)
    fillet1_piece_14a = split(fillet1_piece_14a, bisect_by=Plane(origin=(3.832225691, 43, 19.056822612), z_dir=(0, 1, 0)), keep=Keep.TOP, mode=Mode.PRIVATE)
    fillet1_piece_14a = fillet1_piece_14a - Plane(origin=(3.832225691, 51, 11.75), x_dir=(0, 1, 0), z_dir=(1, 0, 0)) * Cylinder(9.75, 15, mode=Mode.PRIVATE)
    with BuildSketch(Plane(origin=(4.078561141, 43, 23.5), x_dir=(0, 1, 0), z_dir=(0, 0, -1))) as fillet1_piece_14b_section:
        with BuildLine():
            CenterArc((FILLET1_R, -FILLET1_R), FILLET1_R, 90, 90)
            Line((0, -FILLET1_R), (0, 0))
            Line((0, 0), (FILLET1_R, 0))
        make_face()
    fillet1_piece_14b = extrude(amount=6.75, mode=Mode.PRIVATE)
    fillet1_piece_14b = split(fillet1_piece_14b, bisect_by=Plane(origin=(3.830284938, 43.190014641, 19.25), z_dir=(0, 0, -1)), keep=Keep.TOP, mode=Mode.PRIVATE)
    fillet1_piece_14b = fillet1_piece_14b - Plane(origin=(3.830284938, 51, 11.75), x_dir=(0, 1, 0), z_dir=(1, 0, 0)) * Cylinder(9.75, 18, mode=Mode.PRIVATE)
    fillet1_piece_14 = fillet1_piece_14a & fillet1_piece_14b
    add(fillet1_piece_14)


solid = part.part
